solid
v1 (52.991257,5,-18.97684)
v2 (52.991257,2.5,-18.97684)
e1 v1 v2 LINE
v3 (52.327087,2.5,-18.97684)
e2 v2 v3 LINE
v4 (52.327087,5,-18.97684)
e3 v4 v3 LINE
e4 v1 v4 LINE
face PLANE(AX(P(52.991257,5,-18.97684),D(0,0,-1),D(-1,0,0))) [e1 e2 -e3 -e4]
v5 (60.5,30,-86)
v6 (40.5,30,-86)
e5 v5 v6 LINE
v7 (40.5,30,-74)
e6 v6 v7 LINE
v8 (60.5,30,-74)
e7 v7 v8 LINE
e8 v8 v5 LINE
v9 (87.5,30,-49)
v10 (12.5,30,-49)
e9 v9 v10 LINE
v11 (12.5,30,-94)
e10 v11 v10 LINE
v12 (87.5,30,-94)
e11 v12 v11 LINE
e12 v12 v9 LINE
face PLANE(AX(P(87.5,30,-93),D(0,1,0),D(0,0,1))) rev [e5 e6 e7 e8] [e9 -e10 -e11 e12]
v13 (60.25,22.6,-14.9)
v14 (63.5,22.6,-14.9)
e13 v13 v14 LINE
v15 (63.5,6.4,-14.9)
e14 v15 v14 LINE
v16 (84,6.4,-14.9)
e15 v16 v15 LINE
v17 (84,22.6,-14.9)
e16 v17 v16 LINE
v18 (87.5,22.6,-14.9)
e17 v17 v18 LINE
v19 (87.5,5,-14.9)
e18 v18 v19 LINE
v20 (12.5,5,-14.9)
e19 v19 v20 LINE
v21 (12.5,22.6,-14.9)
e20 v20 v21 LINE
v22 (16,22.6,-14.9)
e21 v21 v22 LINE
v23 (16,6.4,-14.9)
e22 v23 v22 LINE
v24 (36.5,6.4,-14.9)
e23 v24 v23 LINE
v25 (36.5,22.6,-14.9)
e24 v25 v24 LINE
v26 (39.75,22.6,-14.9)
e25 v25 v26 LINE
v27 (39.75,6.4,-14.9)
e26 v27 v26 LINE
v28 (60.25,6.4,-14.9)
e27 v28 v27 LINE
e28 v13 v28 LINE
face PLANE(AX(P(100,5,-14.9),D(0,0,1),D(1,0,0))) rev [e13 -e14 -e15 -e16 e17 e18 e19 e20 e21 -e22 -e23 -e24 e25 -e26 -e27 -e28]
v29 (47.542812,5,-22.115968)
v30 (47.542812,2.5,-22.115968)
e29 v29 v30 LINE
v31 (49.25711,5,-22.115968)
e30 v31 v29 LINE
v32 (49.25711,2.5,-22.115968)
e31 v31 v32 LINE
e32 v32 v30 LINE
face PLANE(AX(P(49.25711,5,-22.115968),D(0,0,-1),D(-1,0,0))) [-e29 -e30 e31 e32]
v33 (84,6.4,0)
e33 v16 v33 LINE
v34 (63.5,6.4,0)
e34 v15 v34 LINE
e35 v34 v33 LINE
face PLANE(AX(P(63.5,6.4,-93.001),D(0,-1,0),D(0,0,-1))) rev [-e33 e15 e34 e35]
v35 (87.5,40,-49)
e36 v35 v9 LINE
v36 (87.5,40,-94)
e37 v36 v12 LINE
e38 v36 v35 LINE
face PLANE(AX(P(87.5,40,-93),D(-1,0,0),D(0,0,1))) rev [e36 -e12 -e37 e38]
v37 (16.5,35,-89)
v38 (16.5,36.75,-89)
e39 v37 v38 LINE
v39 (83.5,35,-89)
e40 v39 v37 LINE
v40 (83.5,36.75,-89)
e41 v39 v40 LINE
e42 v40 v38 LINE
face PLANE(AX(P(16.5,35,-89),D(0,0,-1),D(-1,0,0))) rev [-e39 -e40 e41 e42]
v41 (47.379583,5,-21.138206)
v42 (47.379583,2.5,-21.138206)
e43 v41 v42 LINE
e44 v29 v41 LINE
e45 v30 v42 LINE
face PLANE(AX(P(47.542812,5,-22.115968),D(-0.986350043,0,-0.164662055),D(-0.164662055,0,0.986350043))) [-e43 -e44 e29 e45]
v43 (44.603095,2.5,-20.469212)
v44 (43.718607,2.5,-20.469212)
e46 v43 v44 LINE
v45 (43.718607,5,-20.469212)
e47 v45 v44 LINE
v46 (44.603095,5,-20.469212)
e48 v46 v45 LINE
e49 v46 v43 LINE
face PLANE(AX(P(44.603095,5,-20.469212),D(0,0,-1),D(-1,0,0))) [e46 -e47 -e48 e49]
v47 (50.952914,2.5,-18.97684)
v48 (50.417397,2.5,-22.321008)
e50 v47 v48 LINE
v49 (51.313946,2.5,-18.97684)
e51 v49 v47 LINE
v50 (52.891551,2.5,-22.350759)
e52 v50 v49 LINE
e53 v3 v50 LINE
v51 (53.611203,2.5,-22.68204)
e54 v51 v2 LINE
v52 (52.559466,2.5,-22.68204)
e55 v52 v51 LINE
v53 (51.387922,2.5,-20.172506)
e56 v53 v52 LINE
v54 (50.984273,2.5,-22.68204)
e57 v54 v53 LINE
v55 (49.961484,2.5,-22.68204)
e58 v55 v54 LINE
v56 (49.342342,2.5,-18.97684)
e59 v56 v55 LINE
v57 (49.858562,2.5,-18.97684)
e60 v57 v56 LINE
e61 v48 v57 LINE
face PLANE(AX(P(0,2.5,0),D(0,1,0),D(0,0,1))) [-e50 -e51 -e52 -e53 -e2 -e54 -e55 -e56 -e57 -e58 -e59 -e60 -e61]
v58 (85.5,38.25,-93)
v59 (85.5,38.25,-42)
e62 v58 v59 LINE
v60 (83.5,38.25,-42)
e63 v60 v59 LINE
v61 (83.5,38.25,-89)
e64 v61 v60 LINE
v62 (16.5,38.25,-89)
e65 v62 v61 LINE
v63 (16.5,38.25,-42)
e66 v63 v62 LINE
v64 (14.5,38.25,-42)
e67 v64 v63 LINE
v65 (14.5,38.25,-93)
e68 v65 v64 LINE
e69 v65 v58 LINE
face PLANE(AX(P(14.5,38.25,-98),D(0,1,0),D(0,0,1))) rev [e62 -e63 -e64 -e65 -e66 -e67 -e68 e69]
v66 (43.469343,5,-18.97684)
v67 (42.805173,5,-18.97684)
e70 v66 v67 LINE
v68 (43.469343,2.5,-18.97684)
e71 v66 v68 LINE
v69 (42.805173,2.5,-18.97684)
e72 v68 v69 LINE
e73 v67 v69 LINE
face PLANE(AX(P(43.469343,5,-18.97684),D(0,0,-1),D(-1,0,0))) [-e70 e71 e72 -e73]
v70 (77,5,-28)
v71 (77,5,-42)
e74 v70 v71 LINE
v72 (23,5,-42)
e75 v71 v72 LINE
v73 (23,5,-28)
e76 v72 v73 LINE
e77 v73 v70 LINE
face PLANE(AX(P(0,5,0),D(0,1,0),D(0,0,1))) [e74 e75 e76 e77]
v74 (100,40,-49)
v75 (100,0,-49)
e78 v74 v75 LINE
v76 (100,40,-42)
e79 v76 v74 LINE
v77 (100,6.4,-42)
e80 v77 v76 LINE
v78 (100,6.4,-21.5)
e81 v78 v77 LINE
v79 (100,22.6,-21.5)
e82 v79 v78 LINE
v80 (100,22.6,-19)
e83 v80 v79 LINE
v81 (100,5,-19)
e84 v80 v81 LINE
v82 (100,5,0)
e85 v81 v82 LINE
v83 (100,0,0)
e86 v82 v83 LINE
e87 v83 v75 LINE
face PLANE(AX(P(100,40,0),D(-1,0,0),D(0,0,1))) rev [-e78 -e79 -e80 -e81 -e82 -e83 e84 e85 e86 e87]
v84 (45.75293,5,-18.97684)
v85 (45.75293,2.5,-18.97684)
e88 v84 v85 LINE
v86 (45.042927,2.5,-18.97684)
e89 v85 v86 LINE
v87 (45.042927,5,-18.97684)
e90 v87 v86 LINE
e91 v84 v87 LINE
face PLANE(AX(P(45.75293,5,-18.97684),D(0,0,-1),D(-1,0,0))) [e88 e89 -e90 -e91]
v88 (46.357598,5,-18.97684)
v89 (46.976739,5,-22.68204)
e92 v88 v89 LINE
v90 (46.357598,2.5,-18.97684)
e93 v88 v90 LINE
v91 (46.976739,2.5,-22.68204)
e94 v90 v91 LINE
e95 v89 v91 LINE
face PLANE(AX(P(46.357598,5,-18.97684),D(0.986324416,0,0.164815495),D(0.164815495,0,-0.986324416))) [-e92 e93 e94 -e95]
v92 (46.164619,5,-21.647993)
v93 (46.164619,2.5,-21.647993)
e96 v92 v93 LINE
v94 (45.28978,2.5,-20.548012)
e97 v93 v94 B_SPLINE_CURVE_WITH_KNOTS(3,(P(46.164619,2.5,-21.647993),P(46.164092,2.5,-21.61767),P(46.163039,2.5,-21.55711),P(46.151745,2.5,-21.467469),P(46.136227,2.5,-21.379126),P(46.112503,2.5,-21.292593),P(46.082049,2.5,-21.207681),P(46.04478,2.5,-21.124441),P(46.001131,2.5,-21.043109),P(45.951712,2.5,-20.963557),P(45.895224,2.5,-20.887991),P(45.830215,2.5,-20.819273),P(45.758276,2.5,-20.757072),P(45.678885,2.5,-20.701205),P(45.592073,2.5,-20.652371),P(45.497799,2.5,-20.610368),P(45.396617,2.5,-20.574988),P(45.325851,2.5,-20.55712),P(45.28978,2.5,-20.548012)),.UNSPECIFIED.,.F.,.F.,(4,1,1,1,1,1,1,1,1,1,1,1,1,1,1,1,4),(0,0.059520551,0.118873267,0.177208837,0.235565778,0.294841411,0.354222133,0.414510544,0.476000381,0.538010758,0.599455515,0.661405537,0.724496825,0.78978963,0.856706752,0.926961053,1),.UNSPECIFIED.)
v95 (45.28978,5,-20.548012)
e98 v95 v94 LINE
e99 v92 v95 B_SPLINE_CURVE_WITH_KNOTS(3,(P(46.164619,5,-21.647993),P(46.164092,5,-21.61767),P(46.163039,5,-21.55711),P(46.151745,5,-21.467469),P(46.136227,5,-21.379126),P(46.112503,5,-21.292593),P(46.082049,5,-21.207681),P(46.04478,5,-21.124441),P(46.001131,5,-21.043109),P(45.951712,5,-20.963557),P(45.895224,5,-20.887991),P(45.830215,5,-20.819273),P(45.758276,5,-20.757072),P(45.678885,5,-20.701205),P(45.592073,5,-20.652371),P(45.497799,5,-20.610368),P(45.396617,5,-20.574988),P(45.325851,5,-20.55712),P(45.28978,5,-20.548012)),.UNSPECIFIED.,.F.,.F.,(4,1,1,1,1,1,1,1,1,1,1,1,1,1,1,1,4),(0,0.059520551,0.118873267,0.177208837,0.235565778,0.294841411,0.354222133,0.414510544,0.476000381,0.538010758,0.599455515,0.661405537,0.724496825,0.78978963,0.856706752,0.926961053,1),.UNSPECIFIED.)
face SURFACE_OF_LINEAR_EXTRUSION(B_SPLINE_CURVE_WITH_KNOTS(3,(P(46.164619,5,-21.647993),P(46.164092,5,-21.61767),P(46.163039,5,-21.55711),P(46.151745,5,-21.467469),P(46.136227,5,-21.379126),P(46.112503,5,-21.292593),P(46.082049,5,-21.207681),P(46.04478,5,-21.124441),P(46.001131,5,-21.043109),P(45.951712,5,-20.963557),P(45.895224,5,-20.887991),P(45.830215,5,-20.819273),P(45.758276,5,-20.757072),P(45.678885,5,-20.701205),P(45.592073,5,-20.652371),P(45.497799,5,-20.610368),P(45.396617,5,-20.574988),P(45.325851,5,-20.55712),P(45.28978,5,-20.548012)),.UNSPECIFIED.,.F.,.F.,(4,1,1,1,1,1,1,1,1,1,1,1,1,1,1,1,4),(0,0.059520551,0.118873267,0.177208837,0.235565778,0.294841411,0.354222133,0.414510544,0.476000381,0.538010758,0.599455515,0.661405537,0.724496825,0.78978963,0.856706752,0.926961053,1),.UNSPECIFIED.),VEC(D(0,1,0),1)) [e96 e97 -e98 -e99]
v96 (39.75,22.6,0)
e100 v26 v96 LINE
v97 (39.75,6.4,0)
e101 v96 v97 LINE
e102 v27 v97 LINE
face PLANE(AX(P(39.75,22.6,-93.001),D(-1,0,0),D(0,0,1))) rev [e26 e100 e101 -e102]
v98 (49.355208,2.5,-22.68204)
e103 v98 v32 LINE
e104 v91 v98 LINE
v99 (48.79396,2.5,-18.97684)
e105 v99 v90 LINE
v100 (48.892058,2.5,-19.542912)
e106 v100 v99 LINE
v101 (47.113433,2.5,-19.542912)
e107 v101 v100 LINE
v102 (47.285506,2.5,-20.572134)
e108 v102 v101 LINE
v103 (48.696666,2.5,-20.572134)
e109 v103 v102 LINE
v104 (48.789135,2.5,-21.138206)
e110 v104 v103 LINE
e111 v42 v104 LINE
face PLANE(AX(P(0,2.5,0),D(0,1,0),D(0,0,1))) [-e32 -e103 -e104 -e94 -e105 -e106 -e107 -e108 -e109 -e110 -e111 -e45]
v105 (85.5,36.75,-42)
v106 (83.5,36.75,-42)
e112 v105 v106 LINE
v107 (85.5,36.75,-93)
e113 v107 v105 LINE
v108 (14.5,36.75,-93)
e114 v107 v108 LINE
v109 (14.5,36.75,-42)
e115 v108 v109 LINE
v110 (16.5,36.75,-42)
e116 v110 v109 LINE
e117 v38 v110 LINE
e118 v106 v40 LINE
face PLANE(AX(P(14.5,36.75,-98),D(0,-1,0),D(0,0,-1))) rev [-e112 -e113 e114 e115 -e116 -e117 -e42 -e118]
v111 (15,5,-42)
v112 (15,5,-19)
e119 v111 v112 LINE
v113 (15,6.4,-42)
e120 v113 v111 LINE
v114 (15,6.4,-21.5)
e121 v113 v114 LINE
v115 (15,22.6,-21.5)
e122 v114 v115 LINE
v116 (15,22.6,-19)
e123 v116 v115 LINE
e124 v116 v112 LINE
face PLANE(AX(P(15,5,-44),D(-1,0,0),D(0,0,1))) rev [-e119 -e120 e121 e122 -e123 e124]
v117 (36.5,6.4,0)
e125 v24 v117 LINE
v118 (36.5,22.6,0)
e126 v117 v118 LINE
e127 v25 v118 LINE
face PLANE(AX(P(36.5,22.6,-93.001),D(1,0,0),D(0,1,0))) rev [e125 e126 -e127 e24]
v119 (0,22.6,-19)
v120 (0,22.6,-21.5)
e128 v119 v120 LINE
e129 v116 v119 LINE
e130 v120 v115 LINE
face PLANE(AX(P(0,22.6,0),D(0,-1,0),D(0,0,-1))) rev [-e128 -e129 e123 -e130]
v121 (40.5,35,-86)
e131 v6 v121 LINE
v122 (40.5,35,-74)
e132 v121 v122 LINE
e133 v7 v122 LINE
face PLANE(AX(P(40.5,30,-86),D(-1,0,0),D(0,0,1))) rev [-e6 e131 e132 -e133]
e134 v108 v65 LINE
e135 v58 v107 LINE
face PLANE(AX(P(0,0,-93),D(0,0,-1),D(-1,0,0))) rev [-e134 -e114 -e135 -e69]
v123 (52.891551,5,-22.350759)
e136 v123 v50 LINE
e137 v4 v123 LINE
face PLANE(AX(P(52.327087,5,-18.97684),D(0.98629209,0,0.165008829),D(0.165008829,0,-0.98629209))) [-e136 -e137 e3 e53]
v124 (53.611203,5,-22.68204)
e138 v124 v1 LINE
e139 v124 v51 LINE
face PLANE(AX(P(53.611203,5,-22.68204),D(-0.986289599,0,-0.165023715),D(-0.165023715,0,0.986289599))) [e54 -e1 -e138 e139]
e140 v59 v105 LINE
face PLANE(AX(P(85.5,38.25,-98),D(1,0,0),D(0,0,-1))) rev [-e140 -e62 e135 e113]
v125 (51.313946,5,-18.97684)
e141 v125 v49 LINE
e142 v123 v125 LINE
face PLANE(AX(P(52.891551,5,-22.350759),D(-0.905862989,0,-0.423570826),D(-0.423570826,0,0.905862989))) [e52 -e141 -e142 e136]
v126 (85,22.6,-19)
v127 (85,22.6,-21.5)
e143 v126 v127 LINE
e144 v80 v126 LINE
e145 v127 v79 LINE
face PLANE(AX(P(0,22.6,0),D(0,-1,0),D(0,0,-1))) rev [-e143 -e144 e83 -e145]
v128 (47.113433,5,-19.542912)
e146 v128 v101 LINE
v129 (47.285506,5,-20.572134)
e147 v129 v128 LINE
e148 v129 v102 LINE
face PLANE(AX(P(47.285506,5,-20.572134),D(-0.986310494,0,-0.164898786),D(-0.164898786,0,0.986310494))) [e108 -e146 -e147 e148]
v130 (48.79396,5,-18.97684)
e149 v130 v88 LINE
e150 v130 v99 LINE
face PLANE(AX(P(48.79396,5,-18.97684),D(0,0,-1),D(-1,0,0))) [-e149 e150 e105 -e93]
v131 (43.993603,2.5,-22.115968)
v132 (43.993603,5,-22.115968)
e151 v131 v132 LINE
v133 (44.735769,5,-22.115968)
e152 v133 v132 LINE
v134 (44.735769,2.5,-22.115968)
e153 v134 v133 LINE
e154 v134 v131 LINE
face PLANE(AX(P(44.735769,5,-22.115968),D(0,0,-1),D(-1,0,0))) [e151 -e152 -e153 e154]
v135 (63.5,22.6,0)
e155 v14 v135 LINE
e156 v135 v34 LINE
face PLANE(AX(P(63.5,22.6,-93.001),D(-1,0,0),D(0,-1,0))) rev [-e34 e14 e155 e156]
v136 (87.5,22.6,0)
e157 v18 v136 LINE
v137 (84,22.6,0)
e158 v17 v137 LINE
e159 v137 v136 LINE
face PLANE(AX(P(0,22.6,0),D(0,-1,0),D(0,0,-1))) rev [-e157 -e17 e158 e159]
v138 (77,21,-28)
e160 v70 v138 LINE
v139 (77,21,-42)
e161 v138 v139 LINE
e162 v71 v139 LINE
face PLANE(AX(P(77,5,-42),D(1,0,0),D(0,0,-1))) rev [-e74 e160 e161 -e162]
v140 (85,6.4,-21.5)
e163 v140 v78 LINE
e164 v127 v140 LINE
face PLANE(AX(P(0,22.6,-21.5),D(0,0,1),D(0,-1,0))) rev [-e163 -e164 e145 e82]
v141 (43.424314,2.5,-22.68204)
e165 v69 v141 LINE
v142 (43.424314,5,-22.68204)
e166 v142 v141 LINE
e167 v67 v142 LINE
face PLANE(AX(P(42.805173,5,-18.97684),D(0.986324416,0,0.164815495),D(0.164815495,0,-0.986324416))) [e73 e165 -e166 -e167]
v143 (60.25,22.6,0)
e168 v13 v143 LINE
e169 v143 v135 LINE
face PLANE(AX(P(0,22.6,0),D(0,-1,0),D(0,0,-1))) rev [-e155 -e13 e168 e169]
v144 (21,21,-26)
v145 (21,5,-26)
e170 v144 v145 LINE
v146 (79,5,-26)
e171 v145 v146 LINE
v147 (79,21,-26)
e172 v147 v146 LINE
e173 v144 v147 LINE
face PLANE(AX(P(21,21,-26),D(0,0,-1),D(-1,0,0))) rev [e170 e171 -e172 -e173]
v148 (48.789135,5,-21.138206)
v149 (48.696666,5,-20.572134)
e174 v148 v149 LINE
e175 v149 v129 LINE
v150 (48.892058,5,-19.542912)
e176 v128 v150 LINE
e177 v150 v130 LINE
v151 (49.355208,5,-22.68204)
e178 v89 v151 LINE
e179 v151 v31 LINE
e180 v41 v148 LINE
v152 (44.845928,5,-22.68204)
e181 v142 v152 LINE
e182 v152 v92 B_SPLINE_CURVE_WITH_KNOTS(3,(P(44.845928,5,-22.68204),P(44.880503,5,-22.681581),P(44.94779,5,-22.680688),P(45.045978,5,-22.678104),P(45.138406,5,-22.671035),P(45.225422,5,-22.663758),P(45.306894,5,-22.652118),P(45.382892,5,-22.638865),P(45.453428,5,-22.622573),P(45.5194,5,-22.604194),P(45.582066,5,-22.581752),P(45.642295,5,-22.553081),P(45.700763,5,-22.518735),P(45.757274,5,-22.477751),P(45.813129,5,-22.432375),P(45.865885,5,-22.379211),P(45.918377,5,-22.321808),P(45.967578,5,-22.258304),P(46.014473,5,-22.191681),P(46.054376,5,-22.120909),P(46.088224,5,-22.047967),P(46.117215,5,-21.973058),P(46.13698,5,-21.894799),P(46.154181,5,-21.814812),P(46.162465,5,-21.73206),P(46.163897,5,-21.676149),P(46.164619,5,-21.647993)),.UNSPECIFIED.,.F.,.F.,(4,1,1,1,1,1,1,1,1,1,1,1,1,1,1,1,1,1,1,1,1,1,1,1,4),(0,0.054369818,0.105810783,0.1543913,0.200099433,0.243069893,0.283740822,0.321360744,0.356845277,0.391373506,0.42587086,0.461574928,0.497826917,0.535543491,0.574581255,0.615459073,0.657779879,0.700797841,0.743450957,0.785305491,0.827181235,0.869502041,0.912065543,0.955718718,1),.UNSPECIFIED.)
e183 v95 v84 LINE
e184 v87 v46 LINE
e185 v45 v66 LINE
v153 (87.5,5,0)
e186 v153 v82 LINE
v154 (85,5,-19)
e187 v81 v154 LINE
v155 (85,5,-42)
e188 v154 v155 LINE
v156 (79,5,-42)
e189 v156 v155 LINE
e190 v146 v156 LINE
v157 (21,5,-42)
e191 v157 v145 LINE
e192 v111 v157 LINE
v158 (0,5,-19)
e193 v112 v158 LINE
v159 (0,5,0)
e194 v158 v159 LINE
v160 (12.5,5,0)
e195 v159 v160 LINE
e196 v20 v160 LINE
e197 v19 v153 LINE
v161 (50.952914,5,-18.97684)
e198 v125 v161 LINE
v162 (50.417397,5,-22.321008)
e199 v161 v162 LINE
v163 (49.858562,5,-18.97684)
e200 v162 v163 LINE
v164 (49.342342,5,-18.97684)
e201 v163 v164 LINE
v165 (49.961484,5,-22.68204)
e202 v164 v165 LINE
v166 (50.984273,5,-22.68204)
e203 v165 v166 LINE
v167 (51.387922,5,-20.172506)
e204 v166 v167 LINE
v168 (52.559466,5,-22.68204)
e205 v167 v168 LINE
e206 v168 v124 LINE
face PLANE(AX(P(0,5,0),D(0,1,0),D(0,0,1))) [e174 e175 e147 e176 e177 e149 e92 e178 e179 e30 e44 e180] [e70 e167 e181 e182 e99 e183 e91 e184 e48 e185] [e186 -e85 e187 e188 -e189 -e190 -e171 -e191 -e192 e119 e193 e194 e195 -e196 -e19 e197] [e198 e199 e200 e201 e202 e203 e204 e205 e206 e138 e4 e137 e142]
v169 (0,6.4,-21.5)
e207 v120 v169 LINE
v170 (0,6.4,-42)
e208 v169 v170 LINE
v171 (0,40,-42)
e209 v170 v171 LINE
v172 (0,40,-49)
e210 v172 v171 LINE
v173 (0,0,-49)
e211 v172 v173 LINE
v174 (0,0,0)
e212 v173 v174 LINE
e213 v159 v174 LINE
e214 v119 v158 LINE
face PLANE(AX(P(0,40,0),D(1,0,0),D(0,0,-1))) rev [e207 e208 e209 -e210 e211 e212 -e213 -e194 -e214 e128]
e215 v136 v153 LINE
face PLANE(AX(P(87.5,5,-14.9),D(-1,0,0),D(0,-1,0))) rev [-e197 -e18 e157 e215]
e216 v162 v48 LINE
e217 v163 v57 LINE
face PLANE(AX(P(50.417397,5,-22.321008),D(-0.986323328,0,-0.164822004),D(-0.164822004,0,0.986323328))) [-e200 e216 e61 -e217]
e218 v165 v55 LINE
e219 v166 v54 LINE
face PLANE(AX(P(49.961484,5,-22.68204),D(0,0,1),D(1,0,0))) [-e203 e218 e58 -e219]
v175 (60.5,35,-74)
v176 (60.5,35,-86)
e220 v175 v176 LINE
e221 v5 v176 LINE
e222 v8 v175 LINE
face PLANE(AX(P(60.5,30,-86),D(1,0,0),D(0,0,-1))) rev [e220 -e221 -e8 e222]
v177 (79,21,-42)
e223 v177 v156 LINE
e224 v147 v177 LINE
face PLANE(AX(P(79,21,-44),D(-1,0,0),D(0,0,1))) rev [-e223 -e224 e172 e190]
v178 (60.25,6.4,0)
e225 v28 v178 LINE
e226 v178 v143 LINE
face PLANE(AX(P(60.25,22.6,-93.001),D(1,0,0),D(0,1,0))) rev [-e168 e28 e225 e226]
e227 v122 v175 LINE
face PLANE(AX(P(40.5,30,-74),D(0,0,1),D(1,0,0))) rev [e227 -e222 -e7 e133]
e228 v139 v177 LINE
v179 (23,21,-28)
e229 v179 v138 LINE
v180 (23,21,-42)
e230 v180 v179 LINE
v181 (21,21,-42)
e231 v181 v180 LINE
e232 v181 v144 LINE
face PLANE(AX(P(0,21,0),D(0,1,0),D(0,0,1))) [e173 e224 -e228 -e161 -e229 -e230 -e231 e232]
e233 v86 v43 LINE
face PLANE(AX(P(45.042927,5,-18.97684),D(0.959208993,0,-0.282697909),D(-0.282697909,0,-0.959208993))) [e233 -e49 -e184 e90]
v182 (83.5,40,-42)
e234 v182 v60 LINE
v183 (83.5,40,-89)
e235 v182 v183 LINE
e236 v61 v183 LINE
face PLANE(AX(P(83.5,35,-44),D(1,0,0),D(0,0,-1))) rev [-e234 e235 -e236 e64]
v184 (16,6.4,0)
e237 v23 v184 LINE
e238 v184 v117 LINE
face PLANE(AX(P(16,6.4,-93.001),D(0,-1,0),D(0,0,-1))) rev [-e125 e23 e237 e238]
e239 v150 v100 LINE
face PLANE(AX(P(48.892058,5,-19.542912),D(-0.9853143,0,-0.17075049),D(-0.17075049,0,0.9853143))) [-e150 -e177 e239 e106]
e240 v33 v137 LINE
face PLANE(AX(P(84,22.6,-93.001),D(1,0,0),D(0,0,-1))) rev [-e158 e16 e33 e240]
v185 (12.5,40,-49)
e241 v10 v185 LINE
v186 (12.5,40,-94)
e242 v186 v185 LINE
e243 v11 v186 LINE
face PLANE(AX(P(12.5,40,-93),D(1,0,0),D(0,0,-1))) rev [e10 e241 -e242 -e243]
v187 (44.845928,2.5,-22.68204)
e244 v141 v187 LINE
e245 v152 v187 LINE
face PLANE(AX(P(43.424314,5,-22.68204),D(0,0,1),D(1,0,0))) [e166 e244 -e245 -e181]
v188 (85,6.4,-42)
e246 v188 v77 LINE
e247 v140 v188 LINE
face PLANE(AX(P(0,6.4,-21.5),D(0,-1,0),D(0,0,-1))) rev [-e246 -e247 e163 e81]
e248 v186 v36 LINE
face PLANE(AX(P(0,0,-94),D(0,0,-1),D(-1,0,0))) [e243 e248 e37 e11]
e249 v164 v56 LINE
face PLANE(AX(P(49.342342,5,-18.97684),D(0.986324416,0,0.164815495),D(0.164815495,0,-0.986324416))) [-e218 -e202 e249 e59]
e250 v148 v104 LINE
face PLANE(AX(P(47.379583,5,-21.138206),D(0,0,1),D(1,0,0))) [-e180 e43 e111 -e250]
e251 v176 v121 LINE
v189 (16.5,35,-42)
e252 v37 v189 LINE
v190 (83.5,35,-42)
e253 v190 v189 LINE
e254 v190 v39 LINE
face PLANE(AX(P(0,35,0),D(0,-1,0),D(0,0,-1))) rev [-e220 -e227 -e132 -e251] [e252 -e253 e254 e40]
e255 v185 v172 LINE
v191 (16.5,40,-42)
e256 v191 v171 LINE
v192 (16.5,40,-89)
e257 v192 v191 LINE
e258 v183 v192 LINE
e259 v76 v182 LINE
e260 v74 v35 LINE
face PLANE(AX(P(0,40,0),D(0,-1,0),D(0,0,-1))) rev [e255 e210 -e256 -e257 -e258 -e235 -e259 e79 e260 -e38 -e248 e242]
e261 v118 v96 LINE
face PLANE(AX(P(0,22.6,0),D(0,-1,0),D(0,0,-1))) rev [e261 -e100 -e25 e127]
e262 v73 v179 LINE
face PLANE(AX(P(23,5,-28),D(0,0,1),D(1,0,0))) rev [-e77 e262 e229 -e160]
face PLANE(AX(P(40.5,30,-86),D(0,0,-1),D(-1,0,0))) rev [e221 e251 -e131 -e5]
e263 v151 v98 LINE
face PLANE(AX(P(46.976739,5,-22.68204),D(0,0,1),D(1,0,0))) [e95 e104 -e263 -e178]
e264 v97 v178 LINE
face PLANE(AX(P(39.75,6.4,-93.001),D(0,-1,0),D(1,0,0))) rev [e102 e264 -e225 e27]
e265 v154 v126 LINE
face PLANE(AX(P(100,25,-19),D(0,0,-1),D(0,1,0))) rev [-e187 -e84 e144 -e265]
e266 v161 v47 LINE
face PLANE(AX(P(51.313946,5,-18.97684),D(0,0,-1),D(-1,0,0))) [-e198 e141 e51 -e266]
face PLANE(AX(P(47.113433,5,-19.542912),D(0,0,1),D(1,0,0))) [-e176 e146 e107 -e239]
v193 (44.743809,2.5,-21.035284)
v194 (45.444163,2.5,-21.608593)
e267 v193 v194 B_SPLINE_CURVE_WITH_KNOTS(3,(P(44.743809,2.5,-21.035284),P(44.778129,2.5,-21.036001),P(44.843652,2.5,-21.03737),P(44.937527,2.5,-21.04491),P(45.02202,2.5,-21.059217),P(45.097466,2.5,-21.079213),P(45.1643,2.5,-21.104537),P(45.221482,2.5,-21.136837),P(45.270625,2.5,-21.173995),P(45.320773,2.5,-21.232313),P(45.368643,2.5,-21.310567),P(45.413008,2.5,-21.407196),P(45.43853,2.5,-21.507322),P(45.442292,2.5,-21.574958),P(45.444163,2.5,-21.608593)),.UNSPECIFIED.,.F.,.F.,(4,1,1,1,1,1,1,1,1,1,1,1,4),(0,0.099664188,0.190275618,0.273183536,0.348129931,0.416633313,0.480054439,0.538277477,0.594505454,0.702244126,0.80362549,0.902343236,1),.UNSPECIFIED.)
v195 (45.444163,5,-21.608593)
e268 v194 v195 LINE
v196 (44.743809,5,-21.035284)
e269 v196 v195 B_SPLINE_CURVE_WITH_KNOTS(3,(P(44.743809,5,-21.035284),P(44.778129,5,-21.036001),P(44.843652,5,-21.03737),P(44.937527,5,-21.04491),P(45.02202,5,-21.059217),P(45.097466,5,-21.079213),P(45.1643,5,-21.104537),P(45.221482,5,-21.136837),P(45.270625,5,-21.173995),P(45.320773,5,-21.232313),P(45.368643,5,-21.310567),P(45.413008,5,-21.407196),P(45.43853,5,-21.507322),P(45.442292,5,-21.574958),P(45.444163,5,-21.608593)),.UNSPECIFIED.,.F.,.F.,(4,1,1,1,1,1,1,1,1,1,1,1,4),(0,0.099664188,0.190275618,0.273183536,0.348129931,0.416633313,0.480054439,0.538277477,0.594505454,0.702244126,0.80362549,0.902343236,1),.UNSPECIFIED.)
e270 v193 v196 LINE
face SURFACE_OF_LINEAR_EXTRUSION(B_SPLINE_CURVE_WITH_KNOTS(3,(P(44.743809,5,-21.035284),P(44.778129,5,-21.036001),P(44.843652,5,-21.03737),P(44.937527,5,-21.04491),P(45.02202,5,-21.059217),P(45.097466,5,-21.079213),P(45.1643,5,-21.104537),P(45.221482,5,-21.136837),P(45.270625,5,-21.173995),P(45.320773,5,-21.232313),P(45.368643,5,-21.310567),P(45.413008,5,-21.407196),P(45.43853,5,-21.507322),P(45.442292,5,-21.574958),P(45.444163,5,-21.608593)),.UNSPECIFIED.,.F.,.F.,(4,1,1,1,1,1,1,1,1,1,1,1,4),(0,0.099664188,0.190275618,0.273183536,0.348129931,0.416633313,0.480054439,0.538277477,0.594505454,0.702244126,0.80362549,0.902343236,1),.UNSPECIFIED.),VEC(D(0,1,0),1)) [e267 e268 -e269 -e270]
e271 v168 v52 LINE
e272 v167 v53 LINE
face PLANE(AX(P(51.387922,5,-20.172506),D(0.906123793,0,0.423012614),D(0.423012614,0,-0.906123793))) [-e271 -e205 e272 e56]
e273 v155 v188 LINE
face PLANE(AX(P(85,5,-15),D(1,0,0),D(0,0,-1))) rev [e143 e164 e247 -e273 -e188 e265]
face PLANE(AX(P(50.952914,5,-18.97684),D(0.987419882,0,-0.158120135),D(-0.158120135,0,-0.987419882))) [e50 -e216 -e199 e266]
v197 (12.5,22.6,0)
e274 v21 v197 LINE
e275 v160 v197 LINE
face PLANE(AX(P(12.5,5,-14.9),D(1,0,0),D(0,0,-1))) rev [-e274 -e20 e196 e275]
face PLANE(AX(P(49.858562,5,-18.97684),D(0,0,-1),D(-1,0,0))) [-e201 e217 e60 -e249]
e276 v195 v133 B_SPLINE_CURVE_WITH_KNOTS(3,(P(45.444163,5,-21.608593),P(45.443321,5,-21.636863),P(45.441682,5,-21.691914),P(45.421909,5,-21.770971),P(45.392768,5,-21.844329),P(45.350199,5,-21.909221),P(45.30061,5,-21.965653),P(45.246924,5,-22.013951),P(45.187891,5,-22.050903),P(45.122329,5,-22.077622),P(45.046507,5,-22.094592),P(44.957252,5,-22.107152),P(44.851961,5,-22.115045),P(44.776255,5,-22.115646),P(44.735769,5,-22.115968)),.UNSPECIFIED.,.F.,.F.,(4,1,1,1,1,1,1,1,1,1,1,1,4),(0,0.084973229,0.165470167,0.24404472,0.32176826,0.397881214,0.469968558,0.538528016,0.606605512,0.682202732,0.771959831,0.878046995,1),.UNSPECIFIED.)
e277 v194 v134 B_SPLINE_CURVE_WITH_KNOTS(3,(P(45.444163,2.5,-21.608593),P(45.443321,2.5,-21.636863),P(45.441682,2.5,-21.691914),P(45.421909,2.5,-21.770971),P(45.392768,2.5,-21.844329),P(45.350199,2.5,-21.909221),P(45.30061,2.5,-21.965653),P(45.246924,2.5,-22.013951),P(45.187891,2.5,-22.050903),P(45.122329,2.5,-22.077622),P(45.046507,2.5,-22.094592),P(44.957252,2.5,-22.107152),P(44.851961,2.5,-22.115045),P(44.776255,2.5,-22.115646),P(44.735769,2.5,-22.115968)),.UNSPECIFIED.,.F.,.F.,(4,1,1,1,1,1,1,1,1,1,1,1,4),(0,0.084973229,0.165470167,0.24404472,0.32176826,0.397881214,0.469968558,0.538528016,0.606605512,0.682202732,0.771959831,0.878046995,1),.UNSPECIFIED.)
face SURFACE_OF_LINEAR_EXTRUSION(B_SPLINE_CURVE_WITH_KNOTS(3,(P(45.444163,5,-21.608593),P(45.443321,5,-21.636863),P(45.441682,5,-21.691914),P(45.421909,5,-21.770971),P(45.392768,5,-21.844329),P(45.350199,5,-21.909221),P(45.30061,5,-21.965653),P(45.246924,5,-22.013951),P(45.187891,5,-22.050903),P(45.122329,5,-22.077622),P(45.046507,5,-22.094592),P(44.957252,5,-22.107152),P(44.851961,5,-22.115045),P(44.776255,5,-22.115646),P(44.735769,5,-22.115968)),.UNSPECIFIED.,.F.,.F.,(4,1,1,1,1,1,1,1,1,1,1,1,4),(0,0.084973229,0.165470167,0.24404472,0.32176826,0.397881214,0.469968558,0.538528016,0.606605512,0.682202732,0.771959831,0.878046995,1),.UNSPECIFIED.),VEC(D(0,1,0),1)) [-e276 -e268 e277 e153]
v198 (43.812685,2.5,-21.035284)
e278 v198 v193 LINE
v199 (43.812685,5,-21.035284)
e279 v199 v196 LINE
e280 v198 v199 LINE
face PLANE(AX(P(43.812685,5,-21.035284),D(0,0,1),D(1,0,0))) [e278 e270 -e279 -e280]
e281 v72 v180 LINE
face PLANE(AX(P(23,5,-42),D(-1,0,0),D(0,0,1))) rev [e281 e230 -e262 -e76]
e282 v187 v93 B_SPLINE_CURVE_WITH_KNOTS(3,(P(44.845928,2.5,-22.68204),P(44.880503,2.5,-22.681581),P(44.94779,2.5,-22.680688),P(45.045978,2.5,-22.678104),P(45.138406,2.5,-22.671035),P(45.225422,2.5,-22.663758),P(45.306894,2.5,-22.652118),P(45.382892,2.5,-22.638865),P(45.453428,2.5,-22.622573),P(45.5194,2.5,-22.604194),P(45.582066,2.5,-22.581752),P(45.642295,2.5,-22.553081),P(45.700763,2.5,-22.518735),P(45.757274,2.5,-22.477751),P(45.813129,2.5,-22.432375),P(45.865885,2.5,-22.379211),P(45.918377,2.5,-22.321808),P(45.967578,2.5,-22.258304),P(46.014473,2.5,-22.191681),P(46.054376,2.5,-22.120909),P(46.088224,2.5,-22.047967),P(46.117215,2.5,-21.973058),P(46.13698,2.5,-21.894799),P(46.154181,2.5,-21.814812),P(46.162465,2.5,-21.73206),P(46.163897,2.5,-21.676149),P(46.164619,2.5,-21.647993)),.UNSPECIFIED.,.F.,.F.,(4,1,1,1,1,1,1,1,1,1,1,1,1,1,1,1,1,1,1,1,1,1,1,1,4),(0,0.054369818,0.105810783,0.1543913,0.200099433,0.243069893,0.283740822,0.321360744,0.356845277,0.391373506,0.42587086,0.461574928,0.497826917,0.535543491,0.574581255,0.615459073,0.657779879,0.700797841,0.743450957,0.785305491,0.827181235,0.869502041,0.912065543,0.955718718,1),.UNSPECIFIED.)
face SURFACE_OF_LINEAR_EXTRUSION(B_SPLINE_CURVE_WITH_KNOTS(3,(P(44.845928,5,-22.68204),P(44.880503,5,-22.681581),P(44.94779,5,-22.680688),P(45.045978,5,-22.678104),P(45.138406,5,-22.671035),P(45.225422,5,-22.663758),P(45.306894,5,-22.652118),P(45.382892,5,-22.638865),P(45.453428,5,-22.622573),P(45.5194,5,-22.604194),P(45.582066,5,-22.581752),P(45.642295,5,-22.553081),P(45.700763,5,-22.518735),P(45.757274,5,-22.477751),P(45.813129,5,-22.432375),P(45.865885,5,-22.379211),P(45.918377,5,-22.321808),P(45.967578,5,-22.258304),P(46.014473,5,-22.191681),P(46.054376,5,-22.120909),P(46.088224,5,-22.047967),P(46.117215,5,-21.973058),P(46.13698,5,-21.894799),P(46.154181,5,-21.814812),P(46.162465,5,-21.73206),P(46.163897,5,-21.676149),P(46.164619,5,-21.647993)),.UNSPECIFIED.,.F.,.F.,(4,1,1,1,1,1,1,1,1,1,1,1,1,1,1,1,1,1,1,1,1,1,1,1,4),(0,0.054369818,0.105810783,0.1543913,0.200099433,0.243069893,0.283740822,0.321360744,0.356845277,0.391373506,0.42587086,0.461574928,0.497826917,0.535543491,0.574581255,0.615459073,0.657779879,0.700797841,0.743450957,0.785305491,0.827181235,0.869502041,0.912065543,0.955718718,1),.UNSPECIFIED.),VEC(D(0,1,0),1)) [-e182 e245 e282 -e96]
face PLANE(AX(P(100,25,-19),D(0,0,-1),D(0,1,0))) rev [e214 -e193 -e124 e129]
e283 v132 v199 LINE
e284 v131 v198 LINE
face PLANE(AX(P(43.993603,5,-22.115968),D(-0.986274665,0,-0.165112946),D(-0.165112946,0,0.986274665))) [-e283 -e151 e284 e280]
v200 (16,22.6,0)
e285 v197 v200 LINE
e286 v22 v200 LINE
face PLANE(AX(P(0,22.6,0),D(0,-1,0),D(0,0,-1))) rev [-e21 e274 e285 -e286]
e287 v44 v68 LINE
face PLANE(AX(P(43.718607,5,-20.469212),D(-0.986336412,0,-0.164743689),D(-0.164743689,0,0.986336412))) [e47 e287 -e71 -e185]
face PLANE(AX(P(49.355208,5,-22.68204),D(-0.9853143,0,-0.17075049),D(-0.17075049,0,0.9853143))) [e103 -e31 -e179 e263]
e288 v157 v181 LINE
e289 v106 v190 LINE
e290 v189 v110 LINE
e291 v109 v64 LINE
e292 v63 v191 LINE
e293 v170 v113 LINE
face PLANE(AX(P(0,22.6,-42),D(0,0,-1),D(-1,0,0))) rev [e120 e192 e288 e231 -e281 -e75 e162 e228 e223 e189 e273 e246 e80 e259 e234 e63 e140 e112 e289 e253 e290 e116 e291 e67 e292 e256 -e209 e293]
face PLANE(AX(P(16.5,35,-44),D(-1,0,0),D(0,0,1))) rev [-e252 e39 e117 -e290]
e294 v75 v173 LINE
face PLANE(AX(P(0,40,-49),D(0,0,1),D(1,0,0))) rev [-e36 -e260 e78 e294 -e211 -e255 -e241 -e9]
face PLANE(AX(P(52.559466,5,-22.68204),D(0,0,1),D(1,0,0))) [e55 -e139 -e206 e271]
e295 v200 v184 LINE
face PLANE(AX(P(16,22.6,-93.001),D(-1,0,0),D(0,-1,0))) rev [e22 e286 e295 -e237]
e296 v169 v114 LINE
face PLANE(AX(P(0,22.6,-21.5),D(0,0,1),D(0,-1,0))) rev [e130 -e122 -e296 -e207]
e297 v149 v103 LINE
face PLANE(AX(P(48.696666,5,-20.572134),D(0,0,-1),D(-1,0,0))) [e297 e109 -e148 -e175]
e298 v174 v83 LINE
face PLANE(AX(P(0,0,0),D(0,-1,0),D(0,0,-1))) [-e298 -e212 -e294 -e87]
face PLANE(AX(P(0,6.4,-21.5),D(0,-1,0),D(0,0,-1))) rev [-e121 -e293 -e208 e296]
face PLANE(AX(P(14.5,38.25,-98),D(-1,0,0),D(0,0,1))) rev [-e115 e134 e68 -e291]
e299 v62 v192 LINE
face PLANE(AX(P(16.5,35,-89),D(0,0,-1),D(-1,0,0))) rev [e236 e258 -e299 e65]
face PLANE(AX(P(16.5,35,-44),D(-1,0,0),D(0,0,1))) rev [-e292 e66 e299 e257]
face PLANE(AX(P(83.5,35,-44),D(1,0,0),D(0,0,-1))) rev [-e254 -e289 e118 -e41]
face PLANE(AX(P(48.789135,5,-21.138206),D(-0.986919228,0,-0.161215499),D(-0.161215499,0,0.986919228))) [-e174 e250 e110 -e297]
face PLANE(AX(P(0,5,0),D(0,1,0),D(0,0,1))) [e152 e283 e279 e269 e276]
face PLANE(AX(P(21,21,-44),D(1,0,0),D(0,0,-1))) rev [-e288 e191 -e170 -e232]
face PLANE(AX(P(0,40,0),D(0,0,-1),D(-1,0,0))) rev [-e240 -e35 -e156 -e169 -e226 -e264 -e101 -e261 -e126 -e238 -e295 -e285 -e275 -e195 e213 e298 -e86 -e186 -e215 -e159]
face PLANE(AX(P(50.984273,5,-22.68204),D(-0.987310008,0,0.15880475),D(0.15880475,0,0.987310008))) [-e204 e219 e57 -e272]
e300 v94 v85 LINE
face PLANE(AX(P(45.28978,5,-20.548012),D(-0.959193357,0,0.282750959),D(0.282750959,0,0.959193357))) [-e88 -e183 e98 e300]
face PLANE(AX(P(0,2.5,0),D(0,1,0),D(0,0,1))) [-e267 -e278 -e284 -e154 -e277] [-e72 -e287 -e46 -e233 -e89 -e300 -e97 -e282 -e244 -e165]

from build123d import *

# Parameters (mm, degrees)
CROQUIS1_W              = 100
CROQUIS1_H              = 49
SALIENTE_EXTRUIR1_DEPTH = 40
CROQUIS2_W              = 70
CROQUIS2_H              = 29
CORTAR_EXTRUIR1_DEPTH   = 35
CORTAR_EXTRUIR2_DEPTH   = 14.9
CORTAR_EXTRUIR4_DEPTH   = 119.325821358
CROQUIS6_W              = 20.5
CROQUIS6_H              = 16.2
CORTAR_EXTRUIR6_DEPTH   = 119.325821358
CROQUIS7_W              = 58
CROQUIS7_H              = 18
SALIENTE_EXTRUIR2_DEPTH = 16
CROQUIS8_W              = 54
CROQUIS8_H              = 14
CORTAR_EXTRUIR7_DEPTH   = 16
ENVOLVER2_START         = -2.5
ENVOLVER2_DEPTH         = 2.5
CROQUIS11_W             = 75
CROQUIS11_H             = 10
SALIENTE_EXTRUIR3_DEPTH = 44
CROQUIS12_W             = 67
CROQUIS12_H             = 45
CORTAR_EXTRUIR8_DEPTH   = 5
CROQUIS13_W             = 71
CROQUIS13_H             = 1.5
CORTAR_EXTRUIR9_DEPTH   = 54
CROQUIS14_W             = 20
CROQUIS14_H             = 12
CORTAR_EXTRUIR10_DEPTH  = 5
CORTAR_EXTRUIR11_REACH  = 144.299
CROQUIS5_W              = 20.5
CROQUIS5_H              = 16.2
CROQUIS15_W             = 75
CROQUIS15_H             = 10
SALIENTE_EXTRUIR4_DEPTH = 1
CROQUIS16_W             = 75
CROQUIS16_H             = 14.9
CROQUIS16_W_2           = 15
CROQUIS16_H_2           = 25
CORTAR_EXTRUIR12_DEPTH  = 2.4
SALIENTE_EXTRUIR5_DEPTH = 2


# Read off the part's stored shape, not the designer's step: Envolver2
with BuildPart() as part:
    # Croquis1 → Saliente-Extruir1 (new body)
    with BuildSketch(Plane(origin=(0, 0, 0), x_dir=(1, 0, 0), z_dir=(0, 1, 0))):
        with Locations((50, 24.5)):
            Rectangle(CROQUIS1_W, CROQUIS1_H)
    extrude(amount=SALIENTE_EXTRUIR1_DEPTH)

    # Croquis2 → Cortar-Extruir1 (cut)
    with BuildSketch(Plane(origin=(0, 40, 0), x_dir=(1, 0, 0), z_dir=(0, 1, 0))):
        with Locations((50, 29.5)):
            Rectangle(CROQUIS2_W, CROQUIS2_H)
    extrude(amount=-CORTAR_EXTRUIR1_DEPTH, mode=Mode.SUBTRACT)

    # Croquis3 → Cortar-Extruir2 (cut)
    with BuildSketch(Plane.XY):
        Polygon((12.5, 5), (12.5, 25), (87.5, 25), (87.5, 5), (100, 5), (100, 40), (0, 40), (0, 5), align=None)
    extrude(amount=-CORTAR_EXTRUIR2_DEPTH, mode=Mode.SUBTRACT)

    # Croquis4 → Cortar-Extruir4 (cut, through all)
    with BuildSketch(Plane.ZY):
        Polygon((-44, 25), (-19, 25), (-19, 5), (-14.9, 5), (-14.9, 40), (-44, 40), align=None)
    extrude(amount=-CORTAR_EXTRUIR4_DEPTH, mode=Mode.SUBTRACT)

    # Croquis6 → Cortar-Extruir6 (cut, through all)
    with BuildSketch(Plane(origin=(100, 0, 0), x_dir=(0, 0, -1), z_dir=(1, 0, 0))):
        with Locations((31.75, 14.5)):
            Rectangle(CROQUIS6_W, CROQUIS6_H)
    extrude(amount=-CORTAR_EXTRUIR6_DEPTH, mode=Mode.SUBTRACT)

    # Croquis7 → Saliente-Extruir2 (add)
    with BuildSketch(Plane(origin=(0, 5, 0), x_dir=(1, 0, 0), z_dir=(0, 1, 0))):
        with Locations((50, 35)):
            Rectangle(CROQUIS7_W, CROQUIS7_H)
    extrude(amount=SALIENTE_EXTRUIR2_DEPTH)

    # Croquis8 → Cortar-Extruir7 (cut)
    with BuildSketch(Plane(origin=(0, 21, 0), x_dir=(1, 0, 0), z_dir=(0, 1, 0))):
        with Locations((50, 35)):
            Rectangle(CROQUIS8_W, CROQUIS8_H)
    extrude(amount=-CORTAR_EXTRUIR7_DEPTH, mode=Mode.SUBTRACT)

    # Envolver2 outline → Envolver2 (cut)
    # profile 1 of 3: a face of its own
    with BuildSketch(Plane(origin=(0, 5, 0), x_dir=(1, 0, 0), z_dir=(0, 1, 0)).offset(ENVOLVER2_START)):
        with BuildLine():
            add(Edge.make_bspline(
                [(44.845927513, 22.682039813), (44.880502524, 22.681581101), (44.94779002, 22.680688388), (45.045978034, 22.678103561), (45.138406194, 22.671034857), (45.225422346, 22.663758255), (45.306894242, 22.652117669), (45.382891805, 22.638865253), (45.453428219, 22.622573117), (45.519399834, 22.604194379), (45.582065701, 22.58175166), (45.642294727, 22.553081251), (45.700763218, 22.518735345), (45.757273689, 22.477750733), (45.813128977, 22.432374893), (45.865885411, 22.37921084), (45.918377238, 22.321807714), (45.967578278, 22.25830401), (46.01447324, 22.191680732), (46.054376208, 22.120908747), (46.088223994, 22.047966819), (46.117214563, 21.973058038), (46.136979973, 21.894799291), (46.154181469, 21.814812457), (46.162464556, 21.732060085), (46.163897144, 21.676148523), (46.164618555, 21.647993057)],
                knots=[0, 0, 0, 0, 0.054369818, 0.105810783, 0.1543913, 0.200099433, 0.243069893, 0.283740822, 0.321360744, 0.356845277, 0.391373506, 0.42587086, 0.461574928, 0.497826917, 0.535543491, 0.574581255, 0.615459073, 0.657779879, 0.700797841, 0.743450957, 0.785305491, 0.827181235, 0.869502041, 0.912065543, 0.955718718, 1, 1, 1, 1], degree=3))
            Line((44.845927513, 22.682039813), (43.424314244, 22.682039813))
            Line((43.424314244, 22.682039813), (42.805172718, 18.976839617))
            Line((42.805172718, 18.976839617), (43.469342719, 18.976839617))
            Line((43.469342719, 18.976839617), (43.718607489, 20.469211918))
            Line((43.718607489, 20.469211918), (44.603095383, 20.469211918))
            Line((44.603095383, 20.469211918), (45.04292709, 18.976839617))
            Line((45.04292709, 18.976839617), (45.752929645, 18.976839617))
            Line((45.752929645, 18.976839617), (45.28977962, 20.548011749))
            add(Edge.make_bspline(
                [(46.164618555, 21.647993057), (46.164091676, 21.617670303), (46.163039403, 21.5571103), (46.151744736, 21.467468845), (46.13622668, 21.379126232), (46.112503265, 21.292592771), (46.082048693, 21.207680933), (46.044780457, 21.124441143), (46.001130757, 21.043108672), (45.951712013, 20.9635574), (45.895224481, 20.887990565), (45.830214645, 20.819272615), (45.758276279, 20.757071565), (45.678885267, 20.701205138), (45.592072867, 20.652370985), (45.497799172, 20.610367641), (45.396617343, 20.574987864), (45.325850603, 20.557119534), (45.28977962, 20.548011749)],
                knots=[0, 0, 0, 0, 0.059520551, 0.118873267, 0.177208837, 0.235565778, 0.294841411, 0.354222133, 0.414510544, 0.476000381, 0.538010758, 0.599455515, 0.661405537, 0.724496825, 0.78978963, 0.856706752, 0.926961053, 1, 1, 1, 1], degree=3))
        make_face()
        with BuildLine():
            add(Edge.make_bspline(
                [(44.743809366, 21.03528417), (44.778129381, 21.03600119), (44.843652036, 21.0373701), (44.937526666, 21.044910102), (45.022020151, 21.059216882), (45.097465695, 21.079213334), (45.164300411, 21.104537257), (45.221481868, 21.136836672), (45.270624581, 21.17399479), (45.32077283, 21.232312946), (45.36864261, 21.310567266), (45.413007527, 21.407196099), (45.438530205, 21.507321555), (45.442292151, 21.574957755), (45.444162962, 21.608593141)],
                knots=[0, 0, 0, 0, 0.099664188, 0.190275618, 0.273183536, 0.348129931, 0.416633313, 0.480054439, 0.538277477, 0.594505454, 0.702244126, 0.80362549, 0.902343236, 1, 1, 1, 1], degree=3))
            Line((44.743809366, 21.03528417), (43.812684837, 21.03528417))
            Line((43.812684837, 21.03528417), (43.993602816, 22.115967561))
            Line((43.993602816, 22.115967561), (44.735768567, 22.115967561))
            add(Edge.make_bspline(
                [(45.444162962, 21.608593141), (45.443321191, 21.636863214), (45.441681994, 21.691914124), (45.421908744, 21.770970842), (45.392768442, 21.844328967), (45.35019923, 21.909220717), (45.300609579, 21.965653441), (45.246923641, 22.013950522), (45.187891151, 22.050903022), (45.122329195, 22.077622199), (45.046506806, 22.09459194), (44.957252302, 22.107151834), (44.85196106, 22.115045121), (44.776255138, 22.115646142), (44.735768567, 22.115967561)],
                knots=[0, 0, 0, 0, 0.084973229, 0.165470167, 0.24404472, 0.32176826, 0.397881214, 0.469968558, 0.538528016, 0.606605512, 0.682202732, 0.771959831, 0.878046995, 1, 1, 1, 1], degree=3))
        make_face(mode=Mode.SUBTRACT)
    # profile 2 of 3: a face of its own
    with BuildSketch(Plane(origin=(0, 5, 0), x_dir=(1, 0, 0), z_dir=(0, 1, 0)).offset(ENVOLVER2_START)):
        Polygon((46.976739258, 22.682039813), (46.357597732, 18.976839617), (48.79395984, 18.976839617), (48.892057588, 19.542911869), (47.113432841, 19.542911869), (47.285505941, 20.572134146), (48.696666171, 20.572134146), (48.78913536, 21.138206398), (47.379583289, 21.138206398), (47.54281151, 22.115967561), (49.257109864, 22.115967561), (49.355207612, 22.682039813), align=None)
    # profile 3 of 3: a face of its own
    with BuildSketch(Plane(origin=(0, 5, 0), x_dir=(1, 0, 0), z_dir=(0, 1, 0)).offset(ENVOLVER2_START)):
        Polygon((50.984273497, 22.682039813), (49.96148386, 22.682039813), (49.342342334, 18.976839617), (49.858561632, 18.976839617), (50.417397165, 22.321007936), (50.952914381, 18.976839617), (51.313946257, 18.976839617), (52.891551028, 22.350758892), (52.327086936, 18.976839617), (52.991256936, 18.976839617), (53.611202541, 22.682039813), (52.559466028, 22.682039813), (51.387921608, 20.172506434), align=None)
    extrude(amount=ENVOLVER2_DEPTH, mode=Mode.SUBTRACT)

    # Croquis11 → Saliente-Extruir3 (add)
    with BuildSketch(Plane(origin=(0, 0, -49), x_dir=(-1, 0, 0), z_dir=(0, 0, -1))):
        with Locations((-50, 35)):
            Rectangle(CROQUIS11_W, CROQUIS11_H)
    extrude(amount=SALIENTE_EXTRUIR3_DEPTH)

    # Croquis12 → Cortar-Extruir8 (cut)
    with BuildSketch(Plane(origin=(0, 40, 0), x_dir=(1, 0, 0), z_dir=(0, 1, 0))):
        with Locations((50, 66.5)):
            Rectangle(CROQUIS12_W, CROQUIS12_H)
    extrude(amount=-CORTAR_EXTRUIR8_DEPTH, mode=Mode.SUBTRACT)

    # Croquis13 → Cortar-Extruir9 (cut)
    with BuildSketch(Plane.XY.offset(-44)):
        with Locations((50, 37.5)):
            Rectangle(CROQUIS13_W, CROQUIS13_H)
    extrude(amount=-CORTAR_EXTRUIR9_DEPTH, mode=Mode.SUBTRACT)

    # Croquis14 → Cortar-Extruir10 (cut)
    with BuildSketch(Plane(origin=(0, 35, 0), x_dir=(1, 0, 0), z_dir=(0, 1, 0))):
        with Locations((50.5, 80)):
            Rectangle(CROQUIS14_W, CROQUIS14_H)
    extrude(amount=-CORTAR_EXTRUIR10_DEPTH, mode=Mode.SUBTRACT)

    # Croquis5 → Cortar-Extruir11 (cut, up to next)
    with BuildSketch(Plane.XY, mode=Mode.PRIVATE) as cortar_extruir11_sk1:
        with Locations((26.25, 14.5)):
            Rectangle(CROQUIS5_W, CROQUIS5_H)
    cortar_extruir11_tool1 = extrude(cortar_extruir11_sk1.sketch, amount=-CORTAR_EXTRUIR11_REACH, mode=Mode.PRIVATE) & part.part
    # Croquis5 → Cortar-Extruir11 (cut, up to next)
    with BuildSketch(Plane.XY, mode=Mode.PRIVATE) as cortar_extruir11_sk2:
        with Locations((50, 14.5)):
            Rectangle(CROQUIS5_W, CROQUIS5_H)
    cortar_extruir11_tool2 = extrude(cortar_extruir11_sk2.sketch, amount=-CORTAR_EXTRUIR11_REACH, mode=Mode.PRIVATE) & part.part
    # Croquis5 → Cortar-Extruir11 (cut, up to next)
    with BuildSketch(Plane.XY, mode=Mode.PRIVATE) as cortar_extruir11_sk3:
        with Locations((73.75, 14.5)):
            Rectangle(CROQUIS5_W, CROQUIS5_H)
    cortar_extruir11_tool3 = extrude(cortar_extruir11_sk3.sketch, amount=-CORTAR_EXTRUIR11_REACH, mode=Mode.PRIVATE) & part.part
    add(cortar_extruir11_tool1.solids().sort_by_distance((26.25, 14.5, 0))[0], mode=Mode.SUBTRACT)
    add(cortar_extruir11_tool2.solids().sort_by_distance((50, 14.5, 0))[0], mode=Mode.SUBTRACT)
    add(cortar_extruir11_tool3.solids().sort_by_distance((73.75, 14.5, 0))[0], mode=Mode.SUBTRACT)

    # Croquis15 → Saliente-Extruir4 (add)
    with BuildSketch(Plane(origin=(0, 0, -93), x_dir=(-1, 0, 0), z_dir=(0, 0, -1))):
        with Locations((-50, 35)):
            Rectangle(CROQUIS15_W, CROQUIS15_H)
    extrude(amount=SALIENTE_EXTRUIR4_DEPTH)

    # Croquis16 → Cortar-Extruir12 (cut)
    with BuildSketch(Plane(origin=(0, 25, 0), x_dir=(1, 0, 0), z_dir=(0, 1, 0))):
        with Locations((50, 7.45)):
            Rectangle(CROQUIS16_W, CROQUIS16_H)
        with Locations((7.5, 31.5)):
            Rectangle(CROQUIS16_W_2, CROQUIS16_H_2)
        with Locations((92.5, 31.5)):
            Rectangle(CROQUIS16_W_2, CROQUIS16_H_2)
    extrude(amount=-CORTAR_EXTRUIR12_DEPTH, mode=Mode.SUBTRACT)

    # Croquis17 → Saliente-Extruir5 (add)
    with BuildSketch(Plane.XY.offset(-44)):
        Polygon((0, 40), (16.5, 40), (16.5, 38.25), (14.5, 38.25), (14.5, 36.75), (16.5, 36.75), (16.5, 35), (83.5, 35), (83.5, 36.75), (85.5, 36.75), (85.5, 38.25), (83.5, 38.25), (83.5, 40), (100, 40), (100, 22.6), (85, 22.6), (85, 5), (79, 5), (79, 21), (21, 21), (21, 5), (15, 5), (15, 22.6), (0, 22.6), align=None)
    extrude(amount=SALIENTE_EXTRUIR5_DEPTH)


solid = part.part
